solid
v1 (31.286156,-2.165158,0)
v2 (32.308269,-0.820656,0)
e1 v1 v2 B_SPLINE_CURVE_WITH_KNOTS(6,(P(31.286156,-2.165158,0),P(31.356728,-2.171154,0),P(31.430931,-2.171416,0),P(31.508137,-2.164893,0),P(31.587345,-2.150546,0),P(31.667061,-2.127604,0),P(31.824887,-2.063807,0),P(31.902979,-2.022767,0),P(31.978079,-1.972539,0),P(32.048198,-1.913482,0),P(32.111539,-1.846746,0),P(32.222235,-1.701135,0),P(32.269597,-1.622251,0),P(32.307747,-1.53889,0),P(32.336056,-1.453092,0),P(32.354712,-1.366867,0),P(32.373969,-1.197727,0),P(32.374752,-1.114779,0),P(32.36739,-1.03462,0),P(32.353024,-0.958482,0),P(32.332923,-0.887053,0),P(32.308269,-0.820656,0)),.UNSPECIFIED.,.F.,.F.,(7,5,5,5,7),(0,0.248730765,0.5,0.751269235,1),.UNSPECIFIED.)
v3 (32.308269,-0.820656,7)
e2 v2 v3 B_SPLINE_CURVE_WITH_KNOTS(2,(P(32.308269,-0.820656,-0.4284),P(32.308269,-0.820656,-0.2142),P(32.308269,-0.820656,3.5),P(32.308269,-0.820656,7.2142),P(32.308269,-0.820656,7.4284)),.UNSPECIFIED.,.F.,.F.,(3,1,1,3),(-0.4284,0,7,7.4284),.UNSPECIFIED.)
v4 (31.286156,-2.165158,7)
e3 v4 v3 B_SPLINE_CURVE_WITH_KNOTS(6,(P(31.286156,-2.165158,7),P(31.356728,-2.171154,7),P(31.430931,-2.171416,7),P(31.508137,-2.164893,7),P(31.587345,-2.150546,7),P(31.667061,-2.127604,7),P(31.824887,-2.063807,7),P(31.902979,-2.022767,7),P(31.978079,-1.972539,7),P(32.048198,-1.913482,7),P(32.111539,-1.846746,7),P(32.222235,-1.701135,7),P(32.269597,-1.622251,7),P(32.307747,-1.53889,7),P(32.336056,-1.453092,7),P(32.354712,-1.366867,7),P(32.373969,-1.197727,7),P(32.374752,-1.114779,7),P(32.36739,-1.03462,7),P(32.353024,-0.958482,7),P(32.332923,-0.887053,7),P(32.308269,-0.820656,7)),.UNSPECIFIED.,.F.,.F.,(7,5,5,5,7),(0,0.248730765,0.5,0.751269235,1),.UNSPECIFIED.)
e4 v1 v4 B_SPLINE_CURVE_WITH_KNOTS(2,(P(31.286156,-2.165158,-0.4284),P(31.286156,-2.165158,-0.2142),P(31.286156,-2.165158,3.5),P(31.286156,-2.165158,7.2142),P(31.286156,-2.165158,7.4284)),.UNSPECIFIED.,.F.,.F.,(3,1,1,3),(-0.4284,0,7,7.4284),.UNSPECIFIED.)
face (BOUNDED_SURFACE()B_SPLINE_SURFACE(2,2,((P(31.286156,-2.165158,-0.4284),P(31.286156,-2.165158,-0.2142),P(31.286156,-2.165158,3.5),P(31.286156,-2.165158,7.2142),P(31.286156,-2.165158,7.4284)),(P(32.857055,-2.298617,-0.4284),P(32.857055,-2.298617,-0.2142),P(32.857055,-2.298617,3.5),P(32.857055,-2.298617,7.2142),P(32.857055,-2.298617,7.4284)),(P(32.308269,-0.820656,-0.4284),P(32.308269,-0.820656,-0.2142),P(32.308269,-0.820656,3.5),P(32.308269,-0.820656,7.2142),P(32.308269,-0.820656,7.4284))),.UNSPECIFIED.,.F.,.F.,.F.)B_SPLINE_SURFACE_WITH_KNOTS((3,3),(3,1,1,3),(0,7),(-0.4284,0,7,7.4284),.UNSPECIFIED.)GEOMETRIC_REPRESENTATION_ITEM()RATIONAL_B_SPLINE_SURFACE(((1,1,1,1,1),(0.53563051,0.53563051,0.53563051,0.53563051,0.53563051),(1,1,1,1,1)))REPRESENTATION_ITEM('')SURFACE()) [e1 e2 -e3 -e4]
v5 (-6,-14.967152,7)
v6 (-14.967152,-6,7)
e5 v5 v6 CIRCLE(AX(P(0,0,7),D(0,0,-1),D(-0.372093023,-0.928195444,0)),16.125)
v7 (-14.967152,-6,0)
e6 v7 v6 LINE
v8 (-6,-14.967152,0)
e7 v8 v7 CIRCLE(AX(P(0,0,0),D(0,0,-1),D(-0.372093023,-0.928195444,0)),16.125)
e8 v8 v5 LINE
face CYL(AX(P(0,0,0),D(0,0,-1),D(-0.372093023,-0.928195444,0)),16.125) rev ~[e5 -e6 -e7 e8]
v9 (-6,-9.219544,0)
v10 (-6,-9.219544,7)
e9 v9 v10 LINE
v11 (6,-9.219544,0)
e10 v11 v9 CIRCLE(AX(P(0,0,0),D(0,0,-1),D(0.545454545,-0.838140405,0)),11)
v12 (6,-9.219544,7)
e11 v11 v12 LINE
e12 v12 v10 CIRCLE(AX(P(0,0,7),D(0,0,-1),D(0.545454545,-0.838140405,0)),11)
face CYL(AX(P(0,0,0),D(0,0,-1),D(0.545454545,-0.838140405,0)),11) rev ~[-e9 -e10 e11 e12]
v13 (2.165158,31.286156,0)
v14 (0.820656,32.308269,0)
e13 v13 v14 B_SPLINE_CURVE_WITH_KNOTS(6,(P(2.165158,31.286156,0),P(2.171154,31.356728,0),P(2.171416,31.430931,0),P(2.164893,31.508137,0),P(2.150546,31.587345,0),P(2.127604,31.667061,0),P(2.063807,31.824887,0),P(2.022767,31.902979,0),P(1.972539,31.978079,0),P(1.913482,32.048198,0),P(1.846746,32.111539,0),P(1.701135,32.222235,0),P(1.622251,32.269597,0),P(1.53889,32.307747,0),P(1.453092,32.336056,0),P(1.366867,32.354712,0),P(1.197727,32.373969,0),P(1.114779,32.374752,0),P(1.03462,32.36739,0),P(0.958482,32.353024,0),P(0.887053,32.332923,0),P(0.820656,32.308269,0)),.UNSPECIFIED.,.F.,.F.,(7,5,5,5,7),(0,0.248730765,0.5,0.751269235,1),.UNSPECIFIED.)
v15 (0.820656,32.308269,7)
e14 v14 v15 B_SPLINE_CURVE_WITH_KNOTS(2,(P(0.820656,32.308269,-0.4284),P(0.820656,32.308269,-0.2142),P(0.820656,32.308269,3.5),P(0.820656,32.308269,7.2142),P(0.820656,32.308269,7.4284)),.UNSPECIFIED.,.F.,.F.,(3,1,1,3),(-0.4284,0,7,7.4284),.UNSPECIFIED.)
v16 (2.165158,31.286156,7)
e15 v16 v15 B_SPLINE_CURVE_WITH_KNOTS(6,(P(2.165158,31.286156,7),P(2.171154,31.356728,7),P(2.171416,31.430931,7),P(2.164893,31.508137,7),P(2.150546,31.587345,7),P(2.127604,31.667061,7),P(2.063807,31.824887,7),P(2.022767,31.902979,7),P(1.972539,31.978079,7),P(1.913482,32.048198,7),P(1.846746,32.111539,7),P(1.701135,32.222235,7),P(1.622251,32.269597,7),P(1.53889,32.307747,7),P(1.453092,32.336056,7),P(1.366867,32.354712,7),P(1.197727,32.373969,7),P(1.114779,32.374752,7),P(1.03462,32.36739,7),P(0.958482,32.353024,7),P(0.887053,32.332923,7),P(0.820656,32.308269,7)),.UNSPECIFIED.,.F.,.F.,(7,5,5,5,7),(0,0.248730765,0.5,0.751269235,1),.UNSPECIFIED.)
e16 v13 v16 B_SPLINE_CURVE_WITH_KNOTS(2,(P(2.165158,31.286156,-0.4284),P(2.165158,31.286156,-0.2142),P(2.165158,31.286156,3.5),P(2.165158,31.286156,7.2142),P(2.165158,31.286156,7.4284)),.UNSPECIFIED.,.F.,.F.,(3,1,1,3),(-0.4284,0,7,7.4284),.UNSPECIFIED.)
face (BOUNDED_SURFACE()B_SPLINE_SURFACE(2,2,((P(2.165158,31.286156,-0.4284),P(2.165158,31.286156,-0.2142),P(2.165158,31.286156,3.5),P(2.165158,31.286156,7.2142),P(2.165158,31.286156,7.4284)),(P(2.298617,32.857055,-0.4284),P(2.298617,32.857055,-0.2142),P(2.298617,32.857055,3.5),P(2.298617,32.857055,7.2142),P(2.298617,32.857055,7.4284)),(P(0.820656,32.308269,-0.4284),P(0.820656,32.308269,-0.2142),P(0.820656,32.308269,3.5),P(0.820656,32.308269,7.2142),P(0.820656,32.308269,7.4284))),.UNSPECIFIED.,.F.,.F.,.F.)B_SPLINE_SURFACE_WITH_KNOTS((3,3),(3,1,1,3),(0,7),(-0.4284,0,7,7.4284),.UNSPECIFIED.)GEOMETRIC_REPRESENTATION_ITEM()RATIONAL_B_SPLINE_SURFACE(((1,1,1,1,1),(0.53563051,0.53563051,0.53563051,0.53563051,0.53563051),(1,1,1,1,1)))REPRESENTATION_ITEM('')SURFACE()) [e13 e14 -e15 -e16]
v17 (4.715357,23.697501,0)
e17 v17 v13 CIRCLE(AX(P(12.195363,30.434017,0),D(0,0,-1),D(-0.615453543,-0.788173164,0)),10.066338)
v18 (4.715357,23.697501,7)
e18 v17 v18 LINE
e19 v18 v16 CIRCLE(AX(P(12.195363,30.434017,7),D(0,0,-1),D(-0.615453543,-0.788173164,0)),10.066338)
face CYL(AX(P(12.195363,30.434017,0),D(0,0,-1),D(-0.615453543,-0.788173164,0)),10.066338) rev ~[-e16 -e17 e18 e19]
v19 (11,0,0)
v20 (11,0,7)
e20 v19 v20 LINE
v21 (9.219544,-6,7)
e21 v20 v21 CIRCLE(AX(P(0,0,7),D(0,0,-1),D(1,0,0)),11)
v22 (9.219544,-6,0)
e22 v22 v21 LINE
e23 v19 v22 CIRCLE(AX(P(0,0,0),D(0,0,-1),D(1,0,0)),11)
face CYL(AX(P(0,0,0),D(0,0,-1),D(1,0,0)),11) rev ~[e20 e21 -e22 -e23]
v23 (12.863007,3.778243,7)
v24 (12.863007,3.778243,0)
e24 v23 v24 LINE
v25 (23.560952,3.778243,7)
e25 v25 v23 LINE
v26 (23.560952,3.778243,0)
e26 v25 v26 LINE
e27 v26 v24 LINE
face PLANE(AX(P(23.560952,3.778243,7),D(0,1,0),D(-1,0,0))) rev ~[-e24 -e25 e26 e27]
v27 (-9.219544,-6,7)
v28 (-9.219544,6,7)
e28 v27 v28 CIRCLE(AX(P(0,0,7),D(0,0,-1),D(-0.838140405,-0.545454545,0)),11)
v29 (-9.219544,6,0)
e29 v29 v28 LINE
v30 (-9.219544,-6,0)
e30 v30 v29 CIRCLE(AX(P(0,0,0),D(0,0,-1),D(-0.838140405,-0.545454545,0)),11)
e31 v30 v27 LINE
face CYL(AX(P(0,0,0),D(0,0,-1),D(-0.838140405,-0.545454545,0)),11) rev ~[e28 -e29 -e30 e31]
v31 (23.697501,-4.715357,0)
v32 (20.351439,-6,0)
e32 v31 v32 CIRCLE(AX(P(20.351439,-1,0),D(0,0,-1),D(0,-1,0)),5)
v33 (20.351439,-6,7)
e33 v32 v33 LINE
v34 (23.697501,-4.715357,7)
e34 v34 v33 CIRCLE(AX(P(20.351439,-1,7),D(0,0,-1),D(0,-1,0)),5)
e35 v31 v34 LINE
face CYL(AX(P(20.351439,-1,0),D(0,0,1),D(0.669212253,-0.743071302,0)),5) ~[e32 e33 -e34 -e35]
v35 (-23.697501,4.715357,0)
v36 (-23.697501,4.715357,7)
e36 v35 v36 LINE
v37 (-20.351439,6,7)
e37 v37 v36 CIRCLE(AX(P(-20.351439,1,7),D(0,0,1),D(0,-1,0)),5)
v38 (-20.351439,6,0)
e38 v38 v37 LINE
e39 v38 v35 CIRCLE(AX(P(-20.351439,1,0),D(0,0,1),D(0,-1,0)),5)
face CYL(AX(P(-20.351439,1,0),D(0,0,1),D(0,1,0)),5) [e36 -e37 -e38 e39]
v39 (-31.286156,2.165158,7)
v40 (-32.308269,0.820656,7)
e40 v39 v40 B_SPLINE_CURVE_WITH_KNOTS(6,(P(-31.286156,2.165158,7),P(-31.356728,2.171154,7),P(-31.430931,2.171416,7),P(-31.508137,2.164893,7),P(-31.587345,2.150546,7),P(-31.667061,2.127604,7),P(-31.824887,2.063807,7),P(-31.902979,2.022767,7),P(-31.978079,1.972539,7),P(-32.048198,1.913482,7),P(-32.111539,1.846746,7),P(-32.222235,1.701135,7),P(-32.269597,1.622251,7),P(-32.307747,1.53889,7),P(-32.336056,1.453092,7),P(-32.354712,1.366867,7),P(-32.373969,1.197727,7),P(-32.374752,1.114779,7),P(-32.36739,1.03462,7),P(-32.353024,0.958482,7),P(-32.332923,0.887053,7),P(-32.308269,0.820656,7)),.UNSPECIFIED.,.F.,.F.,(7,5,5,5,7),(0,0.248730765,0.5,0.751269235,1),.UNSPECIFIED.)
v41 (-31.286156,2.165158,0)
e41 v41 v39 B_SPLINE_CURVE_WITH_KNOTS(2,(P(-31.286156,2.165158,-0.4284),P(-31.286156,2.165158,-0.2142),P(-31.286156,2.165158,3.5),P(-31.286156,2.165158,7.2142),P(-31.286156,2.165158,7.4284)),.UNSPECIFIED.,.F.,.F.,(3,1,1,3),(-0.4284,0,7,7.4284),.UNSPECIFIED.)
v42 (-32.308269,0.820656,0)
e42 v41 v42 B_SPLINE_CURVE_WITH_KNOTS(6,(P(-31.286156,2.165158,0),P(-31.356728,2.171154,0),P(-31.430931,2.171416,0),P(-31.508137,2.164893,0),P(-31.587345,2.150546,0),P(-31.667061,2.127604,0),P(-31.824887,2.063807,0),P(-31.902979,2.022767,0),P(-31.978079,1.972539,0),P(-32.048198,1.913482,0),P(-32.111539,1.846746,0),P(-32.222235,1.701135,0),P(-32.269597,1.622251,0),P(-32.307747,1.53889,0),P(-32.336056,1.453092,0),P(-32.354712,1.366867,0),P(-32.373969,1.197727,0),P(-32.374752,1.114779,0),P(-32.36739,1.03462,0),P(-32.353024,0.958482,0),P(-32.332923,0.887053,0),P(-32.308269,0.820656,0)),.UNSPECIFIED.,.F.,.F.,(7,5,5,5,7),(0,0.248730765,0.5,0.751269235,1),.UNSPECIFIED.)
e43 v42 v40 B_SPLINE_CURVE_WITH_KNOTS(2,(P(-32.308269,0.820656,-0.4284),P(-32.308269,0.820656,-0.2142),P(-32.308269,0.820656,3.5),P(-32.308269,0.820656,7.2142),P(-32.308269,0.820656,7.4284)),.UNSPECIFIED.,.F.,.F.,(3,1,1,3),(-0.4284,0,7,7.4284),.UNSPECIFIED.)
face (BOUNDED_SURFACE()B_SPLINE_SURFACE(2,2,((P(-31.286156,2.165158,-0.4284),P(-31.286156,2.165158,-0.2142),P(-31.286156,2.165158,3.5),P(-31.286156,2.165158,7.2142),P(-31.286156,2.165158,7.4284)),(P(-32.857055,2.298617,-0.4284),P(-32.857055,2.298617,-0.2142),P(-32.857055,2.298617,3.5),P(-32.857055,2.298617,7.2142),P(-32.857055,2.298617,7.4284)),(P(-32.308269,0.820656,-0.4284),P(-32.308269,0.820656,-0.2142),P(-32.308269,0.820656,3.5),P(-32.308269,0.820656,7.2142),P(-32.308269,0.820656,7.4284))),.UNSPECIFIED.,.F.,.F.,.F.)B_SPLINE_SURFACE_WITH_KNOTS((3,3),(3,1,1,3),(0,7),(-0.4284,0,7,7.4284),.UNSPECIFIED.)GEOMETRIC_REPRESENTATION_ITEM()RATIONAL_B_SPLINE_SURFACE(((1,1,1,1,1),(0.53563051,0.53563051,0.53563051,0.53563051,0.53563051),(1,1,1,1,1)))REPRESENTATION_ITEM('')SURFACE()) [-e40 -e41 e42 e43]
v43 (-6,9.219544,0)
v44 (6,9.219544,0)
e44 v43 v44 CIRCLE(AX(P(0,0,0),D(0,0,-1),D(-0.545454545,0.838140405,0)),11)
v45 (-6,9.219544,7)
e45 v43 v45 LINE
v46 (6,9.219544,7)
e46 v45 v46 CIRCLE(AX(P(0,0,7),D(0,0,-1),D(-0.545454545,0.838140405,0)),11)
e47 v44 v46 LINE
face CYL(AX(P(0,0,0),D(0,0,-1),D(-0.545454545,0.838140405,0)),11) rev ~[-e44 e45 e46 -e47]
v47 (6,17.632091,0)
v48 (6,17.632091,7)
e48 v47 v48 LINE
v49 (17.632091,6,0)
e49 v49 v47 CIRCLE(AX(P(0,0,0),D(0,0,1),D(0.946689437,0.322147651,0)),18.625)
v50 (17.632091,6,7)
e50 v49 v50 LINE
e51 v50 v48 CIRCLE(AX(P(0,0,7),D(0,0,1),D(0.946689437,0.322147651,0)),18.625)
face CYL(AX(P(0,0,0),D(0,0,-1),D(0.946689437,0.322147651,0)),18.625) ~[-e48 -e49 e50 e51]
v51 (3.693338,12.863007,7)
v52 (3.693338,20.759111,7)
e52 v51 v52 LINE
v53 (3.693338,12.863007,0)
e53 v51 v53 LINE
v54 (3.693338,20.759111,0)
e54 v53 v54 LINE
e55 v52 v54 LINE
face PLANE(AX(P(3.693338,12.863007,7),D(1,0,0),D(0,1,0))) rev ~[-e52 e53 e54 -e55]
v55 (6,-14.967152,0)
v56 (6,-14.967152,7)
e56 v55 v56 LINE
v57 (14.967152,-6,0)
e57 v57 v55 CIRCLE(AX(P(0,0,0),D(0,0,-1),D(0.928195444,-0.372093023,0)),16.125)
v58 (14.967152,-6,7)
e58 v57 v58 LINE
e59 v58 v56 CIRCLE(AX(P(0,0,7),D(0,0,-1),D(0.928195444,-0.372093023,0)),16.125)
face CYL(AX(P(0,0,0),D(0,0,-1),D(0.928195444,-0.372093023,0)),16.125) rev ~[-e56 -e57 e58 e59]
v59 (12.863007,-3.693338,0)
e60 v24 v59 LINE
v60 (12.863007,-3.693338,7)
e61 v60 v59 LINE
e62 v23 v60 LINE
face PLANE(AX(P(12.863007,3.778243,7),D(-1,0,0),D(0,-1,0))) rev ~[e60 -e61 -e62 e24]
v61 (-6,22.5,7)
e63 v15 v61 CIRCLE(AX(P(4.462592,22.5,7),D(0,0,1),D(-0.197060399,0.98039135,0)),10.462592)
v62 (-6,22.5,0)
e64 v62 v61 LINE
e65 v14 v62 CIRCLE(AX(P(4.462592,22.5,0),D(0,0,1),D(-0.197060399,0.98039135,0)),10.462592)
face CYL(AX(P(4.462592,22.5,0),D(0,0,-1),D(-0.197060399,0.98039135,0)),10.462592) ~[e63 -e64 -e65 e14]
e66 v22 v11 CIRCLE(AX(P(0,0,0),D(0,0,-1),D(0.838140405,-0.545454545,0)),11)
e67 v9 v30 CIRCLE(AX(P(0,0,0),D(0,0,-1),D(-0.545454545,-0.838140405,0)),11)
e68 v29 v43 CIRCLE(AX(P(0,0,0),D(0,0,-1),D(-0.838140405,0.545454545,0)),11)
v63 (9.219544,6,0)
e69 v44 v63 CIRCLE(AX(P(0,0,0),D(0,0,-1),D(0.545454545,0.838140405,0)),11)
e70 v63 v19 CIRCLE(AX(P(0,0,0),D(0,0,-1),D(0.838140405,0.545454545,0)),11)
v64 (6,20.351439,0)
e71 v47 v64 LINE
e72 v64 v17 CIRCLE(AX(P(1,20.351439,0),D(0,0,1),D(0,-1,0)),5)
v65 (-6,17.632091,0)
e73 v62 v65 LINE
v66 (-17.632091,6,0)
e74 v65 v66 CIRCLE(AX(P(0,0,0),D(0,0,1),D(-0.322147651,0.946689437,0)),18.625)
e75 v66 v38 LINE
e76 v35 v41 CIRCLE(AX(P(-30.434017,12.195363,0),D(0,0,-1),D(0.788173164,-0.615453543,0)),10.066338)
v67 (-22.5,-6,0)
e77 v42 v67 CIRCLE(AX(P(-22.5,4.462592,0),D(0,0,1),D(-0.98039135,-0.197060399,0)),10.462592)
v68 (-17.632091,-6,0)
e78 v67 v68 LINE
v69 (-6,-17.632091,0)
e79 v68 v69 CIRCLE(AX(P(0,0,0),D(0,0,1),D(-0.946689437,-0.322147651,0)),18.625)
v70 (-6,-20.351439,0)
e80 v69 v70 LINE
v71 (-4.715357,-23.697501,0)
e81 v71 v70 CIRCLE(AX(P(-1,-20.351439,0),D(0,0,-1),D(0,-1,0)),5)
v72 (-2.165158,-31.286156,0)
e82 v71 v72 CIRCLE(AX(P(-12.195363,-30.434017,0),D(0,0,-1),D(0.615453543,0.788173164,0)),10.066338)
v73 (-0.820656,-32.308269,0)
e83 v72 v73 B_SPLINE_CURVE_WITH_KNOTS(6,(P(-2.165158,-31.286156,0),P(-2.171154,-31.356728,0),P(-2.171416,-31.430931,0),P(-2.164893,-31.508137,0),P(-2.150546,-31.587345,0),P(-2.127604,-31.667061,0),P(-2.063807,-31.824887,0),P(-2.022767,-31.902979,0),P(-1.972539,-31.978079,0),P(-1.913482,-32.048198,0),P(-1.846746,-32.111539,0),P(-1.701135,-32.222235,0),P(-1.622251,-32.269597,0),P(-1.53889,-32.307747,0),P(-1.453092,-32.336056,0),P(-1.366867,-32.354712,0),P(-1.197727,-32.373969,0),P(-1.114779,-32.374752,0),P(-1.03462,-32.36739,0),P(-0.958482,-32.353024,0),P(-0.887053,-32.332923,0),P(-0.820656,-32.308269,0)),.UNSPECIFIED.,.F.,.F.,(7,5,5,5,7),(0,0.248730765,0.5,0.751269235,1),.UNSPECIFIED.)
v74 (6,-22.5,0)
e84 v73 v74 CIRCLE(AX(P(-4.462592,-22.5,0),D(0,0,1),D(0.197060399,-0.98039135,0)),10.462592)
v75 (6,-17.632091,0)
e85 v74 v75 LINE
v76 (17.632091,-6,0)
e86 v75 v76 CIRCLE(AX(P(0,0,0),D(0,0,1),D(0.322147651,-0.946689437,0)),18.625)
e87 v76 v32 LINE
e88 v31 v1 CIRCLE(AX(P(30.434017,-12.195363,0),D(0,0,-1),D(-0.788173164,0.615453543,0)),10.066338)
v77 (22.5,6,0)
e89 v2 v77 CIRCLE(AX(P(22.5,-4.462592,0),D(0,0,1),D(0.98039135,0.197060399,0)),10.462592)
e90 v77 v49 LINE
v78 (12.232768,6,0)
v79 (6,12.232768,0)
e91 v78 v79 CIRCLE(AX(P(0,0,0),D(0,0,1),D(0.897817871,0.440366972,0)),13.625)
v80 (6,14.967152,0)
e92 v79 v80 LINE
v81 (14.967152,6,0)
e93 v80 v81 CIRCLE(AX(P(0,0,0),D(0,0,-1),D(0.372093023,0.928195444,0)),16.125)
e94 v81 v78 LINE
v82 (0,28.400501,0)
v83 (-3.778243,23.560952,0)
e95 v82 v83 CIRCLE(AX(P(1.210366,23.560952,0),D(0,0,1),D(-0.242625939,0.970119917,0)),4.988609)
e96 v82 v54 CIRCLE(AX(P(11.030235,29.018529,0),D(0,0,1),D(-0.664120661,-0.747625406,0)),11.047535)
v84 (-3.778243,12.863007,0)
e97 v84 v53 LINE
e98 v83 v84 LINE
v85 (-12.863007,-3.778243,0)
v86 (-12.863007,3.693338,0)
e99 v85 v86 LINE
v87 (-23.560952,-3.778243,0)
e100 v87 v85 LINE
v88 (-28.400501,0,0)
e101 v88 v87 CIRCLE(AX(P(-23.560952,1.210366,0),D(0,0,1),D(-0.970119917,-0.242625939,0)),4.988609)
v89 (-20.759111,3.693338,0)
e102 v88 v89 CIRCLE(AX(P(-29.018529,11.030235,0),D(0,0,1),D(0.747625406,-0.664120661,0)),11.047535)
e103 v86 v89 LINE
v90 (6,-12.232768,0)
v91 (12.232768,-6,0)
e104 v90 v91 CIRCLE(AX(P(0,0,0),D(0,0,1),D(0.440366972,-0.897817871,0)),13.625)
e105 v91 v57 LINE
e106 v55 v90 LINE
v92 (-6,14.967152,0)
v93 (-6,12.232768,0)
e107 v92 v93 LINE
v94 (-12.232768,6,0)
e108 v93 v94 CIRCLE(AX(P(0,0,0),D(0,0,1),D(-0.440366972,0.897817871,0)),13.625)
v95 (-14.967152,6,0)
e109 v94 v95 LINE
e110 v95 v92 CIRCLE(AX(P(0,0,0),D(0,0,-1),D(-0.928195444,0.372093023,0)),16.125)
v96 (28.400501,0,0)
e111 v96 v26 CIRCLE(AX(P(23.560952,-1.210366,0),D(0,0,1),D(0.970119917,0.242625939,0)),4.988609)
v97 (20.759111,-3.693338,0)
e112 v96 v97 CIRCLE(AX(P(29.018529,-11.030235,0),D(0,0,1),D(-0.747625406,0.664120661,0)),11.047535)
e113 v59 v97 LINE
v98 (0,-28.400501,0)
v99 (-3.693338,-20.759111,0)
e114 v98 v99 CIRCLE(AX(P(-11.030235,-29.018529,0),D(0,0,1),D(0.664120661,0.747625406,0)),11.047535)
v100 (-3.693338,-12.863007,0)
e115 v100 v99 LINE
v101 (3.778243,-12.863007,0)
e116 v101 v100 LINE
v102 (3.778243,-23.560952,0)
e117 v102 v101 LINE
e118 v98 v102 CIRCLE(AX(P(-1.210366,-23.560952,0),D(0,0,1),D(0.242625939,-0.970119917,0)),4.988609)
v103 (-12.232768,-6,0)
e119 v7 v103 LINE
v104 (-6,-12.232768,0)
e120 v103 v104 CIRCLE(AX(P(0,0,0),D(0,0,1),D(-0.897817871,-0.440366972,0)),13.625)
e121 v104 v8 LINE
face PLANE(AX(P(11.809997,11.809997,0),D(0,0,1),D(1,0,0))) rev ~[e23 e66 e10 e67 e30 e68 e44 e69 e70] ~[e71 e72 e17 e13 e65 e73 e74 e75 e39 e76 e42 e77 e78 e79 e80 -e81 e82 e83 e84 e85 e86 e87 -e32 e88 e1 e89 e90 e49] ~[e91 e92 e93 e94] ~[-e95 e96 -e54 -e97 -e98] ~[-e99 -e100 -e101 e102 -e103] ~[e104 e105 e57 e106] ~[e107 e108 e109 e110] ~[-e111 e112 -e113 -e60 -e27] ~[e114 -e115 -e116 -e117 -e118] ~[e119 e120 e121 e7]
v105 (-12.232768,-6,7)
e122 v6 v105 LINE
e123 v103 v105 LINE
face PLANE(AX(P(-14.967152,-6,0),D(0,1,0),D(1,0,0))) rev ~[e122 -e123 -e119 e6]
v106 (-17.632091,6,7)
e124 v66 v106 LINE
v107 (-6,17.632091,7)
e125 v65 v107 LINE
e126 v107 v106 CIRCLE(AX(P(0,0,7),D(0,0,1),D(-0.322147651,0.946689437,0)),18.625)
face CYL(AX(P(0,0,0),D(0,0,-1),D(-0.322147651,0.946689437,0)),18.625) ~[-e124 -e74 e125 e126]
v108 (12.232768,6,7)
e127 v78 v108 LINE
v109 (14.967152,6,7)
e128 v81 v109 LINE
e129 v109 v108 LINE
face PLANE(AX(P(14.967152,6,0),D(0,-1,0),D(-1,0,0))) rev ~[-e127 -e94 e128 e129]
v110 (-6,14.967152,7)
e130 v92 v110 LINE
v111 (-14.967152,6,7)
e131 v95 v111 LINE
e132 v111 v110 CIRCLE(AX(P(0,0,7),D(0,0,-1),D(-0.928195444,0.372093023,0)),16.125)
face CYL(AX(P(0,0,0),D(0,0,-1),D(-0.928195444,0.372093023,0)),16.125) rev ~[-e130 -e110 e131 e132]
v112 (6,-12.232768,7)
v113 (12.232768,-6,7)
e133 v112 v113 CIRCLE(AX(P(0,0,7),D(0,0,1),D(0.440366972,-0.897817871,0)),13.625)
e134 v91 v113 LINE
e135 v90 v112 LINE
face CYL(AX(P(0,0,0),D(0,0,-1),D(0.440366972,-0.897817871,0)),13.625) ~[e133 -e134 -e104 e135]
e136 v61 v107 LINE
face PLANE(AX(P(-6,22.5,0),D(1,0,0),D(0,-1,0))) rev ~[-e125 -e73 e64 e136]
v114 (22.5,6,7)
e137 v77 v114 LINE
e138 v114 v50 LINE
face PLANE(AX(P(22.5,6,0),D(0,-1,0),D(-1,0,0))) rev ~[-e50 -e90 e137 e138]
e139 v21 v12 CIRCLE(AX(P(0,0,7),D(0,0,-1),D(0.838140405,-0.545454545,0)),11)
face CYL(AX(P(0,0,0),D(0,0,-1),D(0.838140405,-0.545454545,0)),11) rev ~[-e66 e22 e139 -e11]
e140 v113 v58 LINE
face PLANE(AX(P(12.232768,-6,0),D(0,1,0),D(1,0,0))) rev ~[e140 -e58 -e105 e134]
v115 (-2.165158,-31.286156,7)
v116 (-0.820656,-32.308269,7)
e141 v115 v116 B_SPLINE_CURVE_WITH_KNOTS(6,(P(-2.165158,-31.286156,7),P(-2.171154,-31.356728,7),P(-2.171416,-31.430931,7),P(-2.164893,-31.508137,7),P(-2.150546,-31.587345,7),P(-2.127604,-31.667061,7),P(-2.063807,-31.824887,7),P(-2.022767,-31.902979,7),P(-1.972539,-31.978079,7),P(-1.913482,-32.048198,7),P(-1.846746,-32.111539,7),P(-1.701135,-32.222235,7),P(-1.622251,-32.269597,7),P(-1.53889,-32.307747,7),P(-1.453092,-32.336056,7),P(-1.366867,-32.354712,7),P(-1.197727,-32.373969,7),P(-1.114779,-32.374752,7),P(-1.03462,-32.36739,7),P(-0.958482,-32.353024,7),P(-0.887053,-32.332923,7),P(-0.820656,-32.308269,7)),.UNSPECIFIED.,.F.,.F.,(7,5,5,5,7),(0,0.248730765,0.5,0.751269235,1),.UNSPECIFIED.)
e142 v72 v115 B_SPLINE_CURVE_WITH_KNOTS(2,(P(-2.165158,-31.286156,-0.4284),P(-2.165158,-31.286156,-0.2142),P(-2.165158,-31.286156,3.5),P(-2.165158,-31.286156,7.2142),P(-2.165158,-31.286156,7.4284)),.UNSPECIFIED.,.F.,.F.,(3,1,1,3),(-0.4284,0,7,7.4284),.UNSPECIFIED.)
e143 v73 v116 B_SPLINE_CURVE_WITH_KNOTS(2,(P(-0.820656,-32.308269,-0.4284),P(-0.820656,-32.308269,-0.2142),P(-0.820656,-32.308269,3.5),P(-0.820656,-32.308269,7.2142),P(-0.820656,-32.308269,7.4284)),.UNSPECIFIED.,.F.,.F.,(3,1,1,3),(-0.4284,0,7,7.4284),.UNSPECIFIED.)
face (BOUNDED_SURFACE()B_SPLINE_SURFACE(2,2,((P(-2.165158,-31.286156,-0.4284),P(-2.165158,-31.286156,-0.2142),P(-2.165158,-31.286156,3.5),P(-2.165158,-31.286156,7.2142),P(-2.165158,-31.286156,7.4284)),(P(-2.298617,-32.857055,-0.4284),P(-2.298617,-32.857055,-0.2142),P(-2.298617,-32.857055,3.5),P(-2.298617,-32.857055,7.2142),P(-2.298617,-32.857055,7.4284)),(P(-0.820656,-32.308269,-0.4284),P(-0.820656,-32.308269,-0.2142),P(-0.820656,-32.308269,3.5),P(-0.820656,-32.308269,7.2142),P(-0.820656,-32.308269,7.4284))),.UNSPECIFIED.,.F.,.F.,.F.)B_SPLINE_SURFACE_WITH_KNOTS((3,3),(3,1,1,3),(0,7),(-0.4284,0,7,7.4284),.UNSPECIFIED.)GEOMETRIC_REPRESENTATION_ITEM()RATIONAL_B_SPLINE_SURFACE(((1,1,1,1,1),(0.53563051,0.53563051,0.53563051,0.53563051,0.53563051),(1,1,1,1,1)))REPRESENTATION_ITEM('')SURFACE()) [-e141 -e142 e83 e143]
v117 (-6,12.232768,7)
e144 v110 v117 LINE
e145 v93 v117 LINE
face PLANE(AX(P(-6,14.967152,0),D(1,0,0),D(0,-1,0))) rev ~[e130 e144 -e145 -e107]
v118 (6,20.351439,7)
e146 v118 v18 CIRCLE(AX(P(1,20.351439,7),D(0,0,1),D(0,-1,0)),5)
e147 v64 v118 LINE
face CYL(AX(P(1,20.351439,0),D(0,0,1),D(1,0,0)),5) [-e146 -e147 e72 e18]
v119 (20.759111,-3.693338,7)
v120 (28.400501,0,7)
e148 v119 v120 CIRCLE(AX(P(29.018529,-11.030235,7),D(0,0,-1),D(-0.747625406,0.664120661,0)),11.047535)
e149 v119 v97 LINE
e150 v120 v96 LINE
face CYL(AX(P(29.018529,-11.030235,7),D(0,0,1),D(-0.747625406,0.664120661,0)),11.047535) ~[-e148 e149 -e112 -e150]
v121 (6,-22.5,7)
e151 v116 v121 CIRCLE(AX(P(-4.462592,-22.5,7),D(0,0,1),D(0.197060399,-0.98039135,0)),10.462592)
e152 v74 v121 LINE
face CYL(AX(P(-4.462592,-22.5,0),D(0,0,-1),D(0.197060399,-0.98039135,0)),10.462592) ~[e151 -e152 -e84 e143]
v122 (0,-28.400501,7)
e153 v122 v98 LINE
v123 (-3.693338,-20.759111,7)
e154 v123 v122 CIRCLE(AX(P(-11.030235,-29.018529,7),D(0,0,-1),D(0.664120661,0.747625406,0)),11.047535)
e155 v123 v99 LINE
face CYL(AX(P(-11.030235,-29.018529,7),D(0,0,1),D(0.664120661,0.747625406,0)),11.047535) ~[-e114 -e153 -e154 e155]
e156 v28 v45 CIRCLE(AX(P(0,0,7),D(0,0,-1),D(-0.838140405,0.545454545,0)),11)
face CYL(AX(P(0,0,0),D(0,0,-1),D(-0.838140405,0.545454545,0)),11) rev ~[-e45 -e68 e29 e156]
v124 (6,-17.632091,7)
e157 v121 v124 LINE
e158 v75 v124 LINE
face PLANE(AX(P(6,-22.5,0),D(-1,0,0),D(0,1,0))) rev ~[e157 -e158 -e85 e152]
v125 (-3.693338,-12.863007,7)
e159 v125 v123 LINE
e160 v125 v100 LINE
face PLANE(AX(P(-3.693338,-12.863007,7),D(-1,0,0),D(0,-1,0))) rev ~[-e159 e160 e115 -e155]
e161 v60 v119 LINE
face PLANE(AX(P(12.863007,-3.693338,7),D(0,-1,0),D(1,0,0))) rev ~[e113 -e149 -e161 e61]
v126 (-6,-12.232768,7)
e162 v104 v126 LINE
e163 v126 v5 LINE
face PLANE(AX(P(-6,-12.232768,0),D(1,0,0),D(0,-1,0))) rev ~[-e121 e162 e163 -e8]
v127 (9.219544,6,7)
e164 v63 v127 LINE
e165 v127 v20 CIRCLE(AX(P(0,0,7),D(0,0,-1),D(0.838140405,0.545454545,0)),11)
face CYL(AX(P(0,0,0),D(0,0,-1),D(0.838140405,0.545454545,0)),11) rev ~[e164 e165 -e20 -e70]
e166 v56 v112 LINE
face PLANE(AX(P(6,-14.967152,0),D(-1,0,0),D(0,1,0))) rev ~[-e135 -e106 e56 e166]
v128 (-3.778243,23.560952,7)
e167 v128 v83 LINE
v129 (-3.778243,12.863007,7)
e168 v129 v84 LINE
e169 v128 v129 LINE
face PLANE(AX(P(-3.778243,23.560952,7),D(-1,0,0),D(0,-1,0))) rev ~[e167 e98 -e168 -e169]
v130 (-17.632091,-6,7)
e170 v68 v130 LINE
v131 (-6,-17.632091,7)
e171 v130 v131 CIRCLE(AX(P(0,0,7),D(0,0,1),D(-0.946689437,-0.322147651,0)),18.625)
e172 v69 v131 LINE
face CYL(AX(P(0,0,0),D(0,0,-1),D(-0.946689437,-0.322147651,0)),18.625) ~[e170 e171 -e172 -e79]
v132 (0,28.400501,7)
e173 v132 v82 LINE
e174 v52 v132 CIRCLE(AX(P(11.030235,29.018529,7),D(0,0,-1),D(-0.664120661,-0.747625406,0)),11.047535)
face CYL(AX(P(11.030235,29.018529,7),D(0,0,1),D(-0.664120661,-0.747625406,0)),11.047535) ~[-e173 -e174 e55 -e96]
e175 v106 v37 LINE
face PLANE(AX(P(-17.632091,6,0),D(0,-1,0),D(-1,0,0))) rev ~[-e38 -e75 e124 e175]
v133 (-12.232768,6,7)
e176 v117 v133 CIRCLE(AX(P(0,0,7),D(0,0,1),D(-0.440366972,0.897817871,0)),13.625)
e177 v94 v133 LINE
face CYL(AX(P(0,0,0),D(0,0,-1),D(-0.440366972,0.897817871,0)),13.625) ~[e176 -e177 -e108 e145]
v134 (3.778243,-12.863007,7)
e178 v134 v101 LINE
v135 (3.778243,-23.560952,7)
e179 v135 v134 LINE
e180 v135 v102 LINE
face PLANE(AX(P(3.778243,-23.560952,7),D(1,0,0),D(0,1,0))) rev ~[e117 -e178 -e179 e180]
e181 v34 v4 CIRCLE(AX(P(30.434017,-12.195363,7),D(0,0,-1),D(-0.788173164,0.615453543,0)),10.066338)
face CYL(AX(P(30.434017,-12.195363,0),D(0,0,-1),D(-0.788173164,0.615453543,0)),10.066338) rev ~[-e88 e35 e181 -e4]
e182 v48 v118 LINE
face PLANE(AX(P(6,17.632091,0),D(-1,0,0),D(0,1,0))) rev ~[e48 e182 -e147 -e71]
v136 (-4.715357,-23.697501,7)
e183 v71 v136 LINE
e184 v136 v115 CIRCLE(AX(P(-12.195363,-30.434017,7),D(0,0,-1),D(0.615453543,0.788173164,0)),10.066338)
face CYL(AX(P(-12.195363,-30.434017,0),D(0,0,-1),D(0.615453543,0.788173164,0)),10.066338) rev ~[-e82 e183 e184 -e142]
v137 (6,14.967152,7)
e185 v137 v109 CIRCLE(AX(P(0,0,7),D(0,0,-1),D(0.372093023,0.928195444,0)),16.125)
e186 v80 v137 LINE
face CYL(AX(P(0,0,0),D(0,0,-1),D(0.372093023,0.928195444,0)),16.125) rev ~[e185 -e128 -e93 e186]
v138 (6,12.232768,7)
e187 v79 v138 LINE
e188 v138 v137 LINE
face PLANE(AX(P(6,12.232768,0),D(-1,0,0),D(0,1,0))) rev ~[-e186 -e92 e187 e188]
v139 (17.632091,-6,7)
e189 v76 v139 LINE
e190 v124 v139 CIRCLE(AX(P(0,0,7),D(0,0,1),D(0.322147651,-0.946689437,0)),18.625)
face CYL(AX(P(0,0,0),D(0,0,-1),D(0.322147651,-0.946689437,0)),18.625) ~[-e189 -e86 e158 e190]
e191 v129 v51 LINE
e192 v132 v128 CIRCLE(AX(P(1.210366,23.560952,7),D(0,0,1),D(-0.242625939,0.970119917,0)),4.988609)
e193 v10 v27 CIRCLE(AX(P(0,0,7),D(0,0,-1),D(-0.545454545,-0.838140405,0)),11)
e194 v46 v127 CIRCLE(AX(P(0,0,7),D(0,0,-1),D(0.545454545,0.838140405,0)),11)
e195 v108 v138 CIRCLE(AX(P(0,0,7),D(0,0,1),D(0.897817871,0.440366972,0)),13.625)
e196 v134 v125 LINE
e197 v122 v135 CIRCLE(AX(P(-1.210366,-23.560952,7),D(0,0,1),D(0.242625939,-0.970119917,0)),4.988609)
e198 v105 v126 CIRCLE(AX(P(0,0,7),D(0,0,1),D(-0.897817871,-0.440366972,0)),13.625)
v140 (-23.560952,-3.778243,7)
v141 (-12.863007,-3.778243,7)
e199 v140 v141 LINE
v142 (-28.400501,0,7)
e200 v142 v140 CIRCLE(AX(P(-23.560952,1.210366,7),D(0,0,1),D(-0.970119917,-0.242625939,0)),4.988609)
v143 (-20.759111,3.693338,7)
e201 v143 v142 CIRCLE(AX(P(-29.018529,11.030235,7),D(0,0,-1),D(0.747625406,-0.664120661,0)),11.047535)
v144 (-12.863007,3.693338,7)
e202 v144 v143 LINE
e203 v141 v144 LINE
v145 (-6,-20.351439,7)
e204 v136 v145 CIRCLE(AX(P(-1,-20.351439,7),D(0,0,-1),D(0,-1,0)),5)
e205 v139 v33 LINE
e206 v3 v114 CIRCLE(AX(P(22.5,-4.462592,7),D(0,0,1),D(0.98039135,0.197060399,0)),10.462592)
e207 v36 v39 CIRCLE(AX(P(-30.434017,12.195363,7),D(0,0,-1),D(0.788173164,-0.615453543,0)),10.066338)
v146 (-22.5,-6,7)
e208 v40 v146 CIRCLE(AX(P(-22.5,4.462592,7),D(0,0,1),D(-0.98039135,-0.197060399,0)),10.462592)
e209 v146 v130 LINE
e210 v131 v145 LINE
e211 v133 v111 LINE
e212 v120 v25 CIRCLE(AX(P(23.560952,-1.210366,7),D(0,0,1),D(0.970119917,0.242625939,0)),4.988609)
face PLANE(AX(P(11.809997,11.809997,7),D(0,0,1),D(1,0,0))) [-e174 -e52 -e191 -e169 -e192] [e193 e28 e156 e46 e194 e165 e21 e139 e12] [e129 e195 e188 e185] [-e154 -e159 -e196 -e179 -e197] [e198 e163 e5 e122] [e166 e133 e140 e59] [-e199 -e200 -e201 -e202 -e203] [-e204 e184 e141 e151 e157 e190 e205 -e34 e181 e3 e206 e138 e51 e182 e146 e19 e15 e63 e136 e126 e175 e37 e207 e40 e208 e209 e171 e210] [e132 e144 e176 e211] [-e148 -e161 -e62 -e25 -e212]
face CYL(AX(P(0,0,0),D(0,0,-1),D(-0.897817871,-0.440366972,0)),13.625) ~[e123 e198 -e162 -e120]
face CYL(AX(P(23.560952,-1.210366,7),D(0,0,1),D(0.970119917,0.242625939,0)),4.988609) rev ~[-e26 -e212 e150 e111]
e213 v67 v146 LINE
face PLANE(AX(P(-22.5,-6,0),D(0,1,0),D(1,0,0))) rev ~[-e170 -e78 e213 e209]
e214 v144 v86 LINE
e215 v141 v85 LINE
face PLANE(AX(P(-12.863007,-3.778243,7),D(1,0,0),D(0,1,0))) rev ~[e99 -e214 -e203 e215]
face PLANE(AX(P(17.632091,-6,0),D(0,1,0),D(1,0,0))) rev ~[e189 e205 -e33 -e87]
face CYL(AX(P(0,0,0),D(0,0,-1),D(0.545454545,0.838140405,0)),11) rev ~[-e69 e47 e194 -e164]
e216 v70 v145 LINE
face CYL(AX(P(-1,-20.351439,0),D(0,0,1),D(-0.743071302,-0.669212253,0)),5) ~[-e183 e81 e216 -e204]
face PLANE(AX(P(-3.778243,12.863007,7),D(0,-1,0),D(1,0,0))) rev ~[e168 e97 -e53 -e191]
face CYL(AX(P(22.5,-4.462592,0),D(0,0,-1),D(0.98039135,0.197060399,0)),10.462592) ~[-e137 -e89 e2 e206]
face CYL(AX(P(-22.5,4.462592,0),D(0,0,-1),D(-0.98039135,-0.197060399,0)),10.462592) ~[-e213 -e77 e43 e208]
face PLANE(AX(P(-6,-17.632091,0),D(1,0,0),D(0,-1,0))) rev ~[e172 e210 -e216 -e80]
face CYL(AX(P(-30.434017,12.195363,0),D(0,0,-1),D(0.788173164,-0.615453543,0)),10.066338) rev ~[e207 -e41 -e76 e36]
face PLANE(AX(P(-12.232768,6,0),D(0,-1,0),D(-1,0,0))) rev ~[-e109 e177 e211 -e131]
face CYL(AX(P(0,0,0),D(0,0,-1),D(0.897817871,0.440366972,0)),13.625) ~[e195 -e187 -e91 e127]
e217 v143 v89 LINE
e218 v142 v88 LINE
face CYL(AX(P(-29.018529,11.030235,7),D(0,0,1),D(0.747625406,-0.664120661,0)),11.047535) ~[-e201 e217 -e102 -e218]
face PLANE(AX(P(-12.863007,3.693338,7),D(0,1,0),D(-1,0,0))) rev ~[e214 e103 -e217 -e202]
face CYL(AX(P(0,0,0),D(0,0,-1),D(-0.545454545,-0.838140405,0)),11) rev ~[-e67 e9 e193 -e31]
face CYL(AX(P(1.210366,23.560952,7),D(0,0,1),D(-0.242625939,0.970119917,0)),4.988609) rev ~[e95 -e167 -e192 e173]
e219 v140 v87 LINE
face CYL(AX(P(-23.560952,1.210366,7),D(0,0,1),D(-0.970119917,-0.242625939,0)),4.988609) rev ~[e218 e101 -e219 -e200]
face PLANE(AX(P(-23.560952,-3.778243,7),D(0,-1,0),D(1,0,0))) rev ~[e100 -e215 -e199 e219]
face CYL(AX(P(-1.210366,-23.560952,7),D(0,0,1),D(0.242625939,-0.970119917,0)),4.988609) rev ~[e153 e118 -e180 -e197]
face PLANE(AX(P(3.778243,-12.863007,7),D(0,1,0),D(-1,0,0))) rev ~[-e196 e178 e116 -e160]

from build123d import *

# Parameters (mm, degrees)
F1_DEPTH = 7
F2_R     = 1
F3_R     = 5
F5_DEPTH = 25


# Not quite as in the source:
# - a feature names something its author has since deleted; it is built from what else it names


with BuildPart() as f1:
    # F0 (on Top) → F1 (new body)
    with BuildSketch(Plane.XY):
        with BuildLine():
            ThreePointArc((6, 14.9671515326), (11.4020968466, 11.4020968466), (14.9671515326, 6))
            Line((14.9671515326, 6), (17.6320907722, 6))
            ThreePointArc((17.6320907722, 6), (13.1698637996, 13.1698637996), (6, 17.6320907722))
            Line((6, 17.6320907722), (6, 14.9671515326))
        make_face()
        with BuildLine():
            Line((17.6320907722, 6), (14.9671515326, 6))
            ThreePointArc((14.9671515326, 6), (15.8328920836, 3.0553483056), (16.125, 0))
            ThreePointArc((16.125, 0), (15.8328920836, -3.0553483056), (14.9671515326, -6))
            Line((14.9671515326, -6), (17.6320907722, -6))
            ThreePointArc((17.6320907722, -6), (18.3750961308, -3.0408004183), (18.625, 0))
            ThreePointArc((18.625, 0), (18.3750961308, 3.0408004183), (17.6320907722, 6))
        make_face()
        with BuildLine():
            Line((17.6320907722, -6), (14.9671515326, -6))
            ThreePointArc((14.9671515326, -6), (11.4020968466, -11.4020968466), (6, -14.9671515326))
            Line((6, -14.9671515326), (6, -17.6320907722))
            ThreePointArc((6, -17.6320907722), (13.1698637996, -13.1698637996), (17.6320907722, -6))
        make_face()
        with BuildLine():
            ThreePointArc((-6, 14.9671515326), (0, 16.125), (6, 14.9671515326))
            Line((6, 14.9671515326), (6, 17.6320907722))
            ThreePointArc((6, 17.6320907722), (0, 18.625), (-6, 17.6320907722))
            Line((-6, 17.6320907722), (-6, 14.9671515326))
        make_face()
        with BuildLine():
            Line((22.5, 6), (17.6320907722, 6))
            ThreePointArc((17.6320907722, 6), (18.3750961308, 3.0408004183), (18.625, 0))
            ThreePointArc((18.625, 0), (18.3750961308, -3.0408004183), (17.6320907722, -6))
            Line((17.6320907722, -6), (22.5, -6))
            Line((22.5, -6), (22.5, 6))
        make_face()
        with BuildLine():
            Line((6, -17.6320907722), (6, -14.9671515326))
            ThreePointArc((6, -14.9671515326), (0, -16.125), (-6, -14.9671515326))
            Line((-6, -14.9671515326), (-6, -17.6320907722))
            ThreePointArc((-6, -17.6320907722), (0, -18.625), (6, -17.6320907722))
        make_face()
        with BuildLine():
            ThreePointArc((-14.9671515326, 6), (-11.4020968466, 11.4020968466), (-6, 14.9671515326))
            Line((-6, 14.9671515326), (-6, 17.6320907722))
            ThreePointArc((-6, 17.6320907722), (-13.1698637996, 13.1698637996), (-17.6320907722, 6))
            Line((-17.6320907722, 6), (-14.9671515326, 6))
        make_face()
        with BuildLine():
            ThreePointArc((-6, 17.6320907722), (0, 18.625), (6, 17.6320907722))
            Line((6, 17.6320907722), (6, 22.5))
            Line((6, 22.5), (-6, 22.5))
            Line((-6, 22.5), (-6, 17.6320907722))
        make_face()
        with BuildLine():
            ThreePointArc((32.757434994, -2.4008296896), (29.1292705505, 3.631764353), (22.5, 6))
            Line((22.5, 6), (22.5, -6))
            ThreePointArc((22.5, -6), (27.1011186164, -2.6967874102), (32.757434994, -2.4008296896))
        make_face()
        with BuildLine():
            Line((-6, -17.6320907722), (-6, -14.9671515326))
            ThreePointArc((-6, -14.9671515326), (-11.4020968466, -11.4020968466), (-14.9671515326, -6))
            Line((-14.9671515326, -6), (-17.6320907722, -6))
            ThreePointArc((-17.6320907722, -6), (-13.1698637996, -13.1698637996), (-6, -17.6320907722))
        make_face()
        with BuildLine():
            Line((6, -22.5), (6, -17.6320907722))
            ThreePointArc((6, -17.6320907722), (0, -18.625), (-6, -17.6320907722))
            Line((-6, -17.6320907722), (-6, -22.5))
            Line((-6, -22.5), (6, -22.5))
        make_face()
        with BuildLine():
            ThreePointArc((-14.9671515326, -6), (-16.125, 0), (-14.9671515326, 6))
            Line((-14.9671515326, 6), (-17.6320907722, 6))
            ThreePointArc((-17.6320907722, 6), (-18.625, 0), (-17.6320907722, -6))
            Line((-17.6320907722, -6), (-14.9671515326, -6))
        make_face()
        with BuildLine():
            Line((-6, 22.5), (6, 22.5))
            ThreePointArc((6, 22.5), (2.6967874102, 27.1011186164), (2.4008296896, 32.757434994))
            ThreePointArc((2.4008296896, 32.757434994), (-3.631764353, 29.1292705505), (-6, 22.5))
        make_face()
        with BuildLine():
            ThreePointArc((-2.4008296896, -32.757434994), (3.631764353, -29.1292705505), (6, -22.5))
            Line((6, -22.5), (-6, -22.5))
            ThreePointArc((-6, -22.5), (-2.6967874102, -27.1011186164), (-2.4008296896, -32.757434994))
        make_face()
        with BuildLine():
            ThreePointArc((-17.6320907722, -6), (-18.625, 0), (-17.6320907722, 6))
            Line((-17.6320907722, 6), (-22.5, 6))
            Line((-22.5, 6), (-22.5, -6))
            Line((-22.5, -6), (-17.6320907722, -6))
        make_face()
        with BuildLine():
            Line((-22.5, -6), (-22.5, 6))
            ThreePointArc((-22.5, 6), (-27.1011186164, 2.6967874102), (-32.757434994, 2.4008296896))
            ThreePointArc((-32.757434994, 2.4008296896), (-29.1292705505, -3.631764353), (-22.5, -6))
        make_face()
        with BuildLine():
            ThreePointArc((-6, 12.2327684929), (0, 13.625), (6, 12.2327684929))
            Line((6, 12.2327684929), (6, 14.9671515326))
            ThreePointArc((6, 14.9671515326), (0, 16.125), (-6, 14.9671515326))
            Line((-6, 14.9671515326), (-6, 12.2327684929))
        make_face()
        with BuildLine():
            ThreePointArc((-6, 9.2195444573), (0, 11), (6, 9.2195444573))
            Line((6, 9.2195444573), (6, 12.2327684929))
            ThreePointArc((6, 12.2327684929), (0, 13.625), (-6, 12.2327684929))
            Line((-6, 12.2327684929), (-6, 9.2195444573))
        make_face()
        with BuildLine():
            ThreePointArc((-12.2327684929, -6), (-13.625, 0), (-12.2327684929, 6))
            Line((-12.2327684929, 6), (-14.9671515326, 6))
            ThreePointArc((-14.9671515326, 6), (-16.125, 0), (-14.9671515326, -6))
            Line((-14.9671515326, -6), (-12.2327684929, -6))
        make_face()
        with BuildLine():
            ThreePointArc((-9.2195444573, -6), (-11, 0), (-9.2195444573, 6))
            Line((-9.2195444573, 6), (-12.2327684929, 6))
            ThreePointArc((-12.2327684929, 6), (-13.625, 0), (-12.2327684929, -6))
            Line((-12.2327684929, -6), (-9.2195444573, -6))
        make_face()
        with BuildLine():
            Line((14.9671515326, 6), (12.2327684929, 6))
            ThreePointArc((12.2327684929, 6), (13.2723791333, 3.0797040673), (13.625, 0))
            ThreePointArc((13.625, 0), (13.2723791333, -3.0797040673), (12.2327684929, -6))
            Line((12.2327684929, -6), (14.9671515326, -6))
            ThreePointArc((14.9671515326, -6), (15.8328920836, -3.0553483056), (16.125, 0))
            ThreePointArc((16.125, 0), (15.8328920836, 3.0553483056), (14.9671515326, 6))
        make_face()
        with BuildLine():
            ThreePointArc((9.2195444573, 6), (10.5454964091, 3.129297922), (11, 0))
            ThreePointArc((11, 0), (10.5454964091, -3.129297922), (9.2195444573, -6))
            Line((9.2195444573, -6), (12.2327684929, -6))
            ThreePointArc((12.2327684929, -6), (13.2723791333, -3.0797040673), (13.625, 0))
            ThreePointArc((13.625, 0), (13.2723791333, 3.0797040673), (12.2327684929, 6))
            Line((12.2327684929, 6), (9.2195444573, 6))
        make_face()
        with BuildLine():
            Line((6, -14.9671515326), (6, -12.2327684929))
            ThreePointArc((6, -12.2327684929), (0, -13.625), (-6, -12.2327684929))
            Line((-6, -12.2327684929), (-6, -14.9671515326))
            ThreePointArc((-6, -14.9671515326), (0, -16.125), (6, -14.9671515326))
        make_face()
        with BuildLine():
            Line((6, -12.2327684929), (6, -9.2195444573))
            ThreePointArc((6, -9.2195444573), (0, -11), (-6, -9.2195444573))
            Line((-6, -9.2195444573), (-6, -12.2327684929))
            ThreePointArc((-6, -12.2327684929), (0, -13.625), (6, -12.2327684929))
        make_face()
        with BuildLine():
            ThreePointArc((-9.2195444573, 6), (-7.7781745931, 7.7781745931), (-6, 9.2195444573))
            Line((-6, 9.2195444573), (-6, 12.2327684929))
            ThreePointArc((-6, 12.2327684929), (-9.6343298937, 9.6343298937), (-12.2327684929, 6))
            Line((-12.2327684929, 6), (-9.2195444573, 6))
        make_face()
        with BuildLine():
            ThreePointArc((6, 9.2195444573), (7.7781745931, 7.7781745931), (9.2195444573, 6))
            Line((9.2195444573, 6), (12.2327684929, 6))
            ThreePointArc((12.2327684929, 6), (9.6343298937, 9.6343298937), (6, 12.2327684929))
            Line((6, 12.2327684929), (6, 9.2195444573))
        make_face()
        with BuildLine():
            Line((12.2327684929, -6), (9.2195444573, -6))
            ThreePointArc((9.2195444573, -6), (7.7781745931, -7.7781745931), (6, -9.2195444573))
            Line((6, -9.2195444573), (6, -12.2327684929))
            ThreePointArc((6, -12.2327684929), (9.6343298937, -9.6343298937), (12.2327684929, -6))
        make_face()
        with BuildLine():
            Line((-6, -12.2327684929), (-6, -9.2195444573))
            ThreePointArc((-6, -9.2195444573), (-7.7781745931, -7.7781745931), (-9.2195444573, -6))
            Line((-9.2195444573, -6), (-12.2327684929, -6))
            ThreePointArc((-12.2327684929, -6), (-9.6343298937, -9.6343298937), (-6, -12.2327684929))
        make_face()
    extrude(amount=F1_DEPTH)

    # F2
    f2_edges = [f1.edges().sort_by_distance(p)[0] for p in [
        (-2.40083, -32.757435, 3.5),
        (-32.757435, 2.40083, 3.5),
        (32.757435, -2.40083, 3.5),
        (2.40083, 32.757435, 3.5),
    ]]
    fillet(f2_edges, radius=F2_R)

    # F3
    f3_edges = [f1.edges().sort_by_distance(p)[0] for p in [
        (-22.5, 6, 3.5),
        (6, 22.5, 3.5),
        (22.5, -6, 3.5),
        (-6, -22.5, 3.5),
    ]]
    fillet(f3_edges, radius=F3_R)

    # F4 (on face) → F5 (cut)
    with BuildSketch(Plane.XY.offset(7)):
        with BuildLine():
            ThreePointArc((0, 28.4005012363), (-2.7218256359, 26.630820183), (-3.7782429717, 23.5609523952))
            Line((-3.7782429717, 23.5609523952), (-3.7782429717, 12.8630073741))
            Line((-3.7782429717, 12.8630073741), (3.6933382507, 12.8630073741))
            Line((3.6933382507, 12.8630073741), (3.6933382507, 20.7591112703))
            ThreePointArc((3.6933382507, 20.7591112703), (1.0835977394, 24.21098844), (0, 28.4005012363))
        make_face()
        with BuildLine():
            ThreePointArc((-20.7591112703, 3.6933382507), (-24.21098844, 1.0835977394), (-28.4005012363, 0))
            ThreePointArc((-28.4005012363, 0), (-26.630820183, -2.7218256359), (-23.5609523952, -3.7782429717))
            Line((-23.5609523952, -3.7782429717), (-12.8630073741, -3.7782429717))
            Line((-12.8630073741, -3.7782429717), (-12.8630073741, 3.6933382507))
            Line((-12.8630073741, 3.6933382507), (-20.7591112703, 3.6933382507))
        make_face()
        with BuildLine():
            ThreePointArc((-3.6933382507, -20.7591112703), (-1.0835977394, -24.21098844), (0, -28.4005012363))
            ThreePointArc((0, -28.4005012363), (2.7218256359, -26.630820183), (3.7782429717, -23.5609523952))
            Line((3.7782429717, -23.5609523952), (3.7782429717, -12.8630073741))
            Line((3.7782429717, -12.8630073741), (-3.6933382507, -12.8630073741))
            Line((-3.6933382507, -12.8630073741), (-3.6933382507, -20.7591112703))
        make_face()
        with BuildLine():
            ThreePointArc((20.7591112703, -3.6933382507), (24.21098844, -1.0835977394), (28.4005012363, 0))
            ThreePointArc((28.4005012363, 0), (26.630820183, 2.7218256359), (23.5609523952, 3.7782429717))
            Line((23.5609523952, 3.7782429717), (12.8630073741, 3.7782429717))
            Line((12.8630073741, 3.7782429717), (12.8630073741, -3.6933382507))
            Line((12.8630073741, -3.6933382507), (20.7591112703, -3.6933382507))
        make_face()
    extrude(amount=-F5_DEPTH, mode=Mode.SUBTRACT)


solid = f1.part
